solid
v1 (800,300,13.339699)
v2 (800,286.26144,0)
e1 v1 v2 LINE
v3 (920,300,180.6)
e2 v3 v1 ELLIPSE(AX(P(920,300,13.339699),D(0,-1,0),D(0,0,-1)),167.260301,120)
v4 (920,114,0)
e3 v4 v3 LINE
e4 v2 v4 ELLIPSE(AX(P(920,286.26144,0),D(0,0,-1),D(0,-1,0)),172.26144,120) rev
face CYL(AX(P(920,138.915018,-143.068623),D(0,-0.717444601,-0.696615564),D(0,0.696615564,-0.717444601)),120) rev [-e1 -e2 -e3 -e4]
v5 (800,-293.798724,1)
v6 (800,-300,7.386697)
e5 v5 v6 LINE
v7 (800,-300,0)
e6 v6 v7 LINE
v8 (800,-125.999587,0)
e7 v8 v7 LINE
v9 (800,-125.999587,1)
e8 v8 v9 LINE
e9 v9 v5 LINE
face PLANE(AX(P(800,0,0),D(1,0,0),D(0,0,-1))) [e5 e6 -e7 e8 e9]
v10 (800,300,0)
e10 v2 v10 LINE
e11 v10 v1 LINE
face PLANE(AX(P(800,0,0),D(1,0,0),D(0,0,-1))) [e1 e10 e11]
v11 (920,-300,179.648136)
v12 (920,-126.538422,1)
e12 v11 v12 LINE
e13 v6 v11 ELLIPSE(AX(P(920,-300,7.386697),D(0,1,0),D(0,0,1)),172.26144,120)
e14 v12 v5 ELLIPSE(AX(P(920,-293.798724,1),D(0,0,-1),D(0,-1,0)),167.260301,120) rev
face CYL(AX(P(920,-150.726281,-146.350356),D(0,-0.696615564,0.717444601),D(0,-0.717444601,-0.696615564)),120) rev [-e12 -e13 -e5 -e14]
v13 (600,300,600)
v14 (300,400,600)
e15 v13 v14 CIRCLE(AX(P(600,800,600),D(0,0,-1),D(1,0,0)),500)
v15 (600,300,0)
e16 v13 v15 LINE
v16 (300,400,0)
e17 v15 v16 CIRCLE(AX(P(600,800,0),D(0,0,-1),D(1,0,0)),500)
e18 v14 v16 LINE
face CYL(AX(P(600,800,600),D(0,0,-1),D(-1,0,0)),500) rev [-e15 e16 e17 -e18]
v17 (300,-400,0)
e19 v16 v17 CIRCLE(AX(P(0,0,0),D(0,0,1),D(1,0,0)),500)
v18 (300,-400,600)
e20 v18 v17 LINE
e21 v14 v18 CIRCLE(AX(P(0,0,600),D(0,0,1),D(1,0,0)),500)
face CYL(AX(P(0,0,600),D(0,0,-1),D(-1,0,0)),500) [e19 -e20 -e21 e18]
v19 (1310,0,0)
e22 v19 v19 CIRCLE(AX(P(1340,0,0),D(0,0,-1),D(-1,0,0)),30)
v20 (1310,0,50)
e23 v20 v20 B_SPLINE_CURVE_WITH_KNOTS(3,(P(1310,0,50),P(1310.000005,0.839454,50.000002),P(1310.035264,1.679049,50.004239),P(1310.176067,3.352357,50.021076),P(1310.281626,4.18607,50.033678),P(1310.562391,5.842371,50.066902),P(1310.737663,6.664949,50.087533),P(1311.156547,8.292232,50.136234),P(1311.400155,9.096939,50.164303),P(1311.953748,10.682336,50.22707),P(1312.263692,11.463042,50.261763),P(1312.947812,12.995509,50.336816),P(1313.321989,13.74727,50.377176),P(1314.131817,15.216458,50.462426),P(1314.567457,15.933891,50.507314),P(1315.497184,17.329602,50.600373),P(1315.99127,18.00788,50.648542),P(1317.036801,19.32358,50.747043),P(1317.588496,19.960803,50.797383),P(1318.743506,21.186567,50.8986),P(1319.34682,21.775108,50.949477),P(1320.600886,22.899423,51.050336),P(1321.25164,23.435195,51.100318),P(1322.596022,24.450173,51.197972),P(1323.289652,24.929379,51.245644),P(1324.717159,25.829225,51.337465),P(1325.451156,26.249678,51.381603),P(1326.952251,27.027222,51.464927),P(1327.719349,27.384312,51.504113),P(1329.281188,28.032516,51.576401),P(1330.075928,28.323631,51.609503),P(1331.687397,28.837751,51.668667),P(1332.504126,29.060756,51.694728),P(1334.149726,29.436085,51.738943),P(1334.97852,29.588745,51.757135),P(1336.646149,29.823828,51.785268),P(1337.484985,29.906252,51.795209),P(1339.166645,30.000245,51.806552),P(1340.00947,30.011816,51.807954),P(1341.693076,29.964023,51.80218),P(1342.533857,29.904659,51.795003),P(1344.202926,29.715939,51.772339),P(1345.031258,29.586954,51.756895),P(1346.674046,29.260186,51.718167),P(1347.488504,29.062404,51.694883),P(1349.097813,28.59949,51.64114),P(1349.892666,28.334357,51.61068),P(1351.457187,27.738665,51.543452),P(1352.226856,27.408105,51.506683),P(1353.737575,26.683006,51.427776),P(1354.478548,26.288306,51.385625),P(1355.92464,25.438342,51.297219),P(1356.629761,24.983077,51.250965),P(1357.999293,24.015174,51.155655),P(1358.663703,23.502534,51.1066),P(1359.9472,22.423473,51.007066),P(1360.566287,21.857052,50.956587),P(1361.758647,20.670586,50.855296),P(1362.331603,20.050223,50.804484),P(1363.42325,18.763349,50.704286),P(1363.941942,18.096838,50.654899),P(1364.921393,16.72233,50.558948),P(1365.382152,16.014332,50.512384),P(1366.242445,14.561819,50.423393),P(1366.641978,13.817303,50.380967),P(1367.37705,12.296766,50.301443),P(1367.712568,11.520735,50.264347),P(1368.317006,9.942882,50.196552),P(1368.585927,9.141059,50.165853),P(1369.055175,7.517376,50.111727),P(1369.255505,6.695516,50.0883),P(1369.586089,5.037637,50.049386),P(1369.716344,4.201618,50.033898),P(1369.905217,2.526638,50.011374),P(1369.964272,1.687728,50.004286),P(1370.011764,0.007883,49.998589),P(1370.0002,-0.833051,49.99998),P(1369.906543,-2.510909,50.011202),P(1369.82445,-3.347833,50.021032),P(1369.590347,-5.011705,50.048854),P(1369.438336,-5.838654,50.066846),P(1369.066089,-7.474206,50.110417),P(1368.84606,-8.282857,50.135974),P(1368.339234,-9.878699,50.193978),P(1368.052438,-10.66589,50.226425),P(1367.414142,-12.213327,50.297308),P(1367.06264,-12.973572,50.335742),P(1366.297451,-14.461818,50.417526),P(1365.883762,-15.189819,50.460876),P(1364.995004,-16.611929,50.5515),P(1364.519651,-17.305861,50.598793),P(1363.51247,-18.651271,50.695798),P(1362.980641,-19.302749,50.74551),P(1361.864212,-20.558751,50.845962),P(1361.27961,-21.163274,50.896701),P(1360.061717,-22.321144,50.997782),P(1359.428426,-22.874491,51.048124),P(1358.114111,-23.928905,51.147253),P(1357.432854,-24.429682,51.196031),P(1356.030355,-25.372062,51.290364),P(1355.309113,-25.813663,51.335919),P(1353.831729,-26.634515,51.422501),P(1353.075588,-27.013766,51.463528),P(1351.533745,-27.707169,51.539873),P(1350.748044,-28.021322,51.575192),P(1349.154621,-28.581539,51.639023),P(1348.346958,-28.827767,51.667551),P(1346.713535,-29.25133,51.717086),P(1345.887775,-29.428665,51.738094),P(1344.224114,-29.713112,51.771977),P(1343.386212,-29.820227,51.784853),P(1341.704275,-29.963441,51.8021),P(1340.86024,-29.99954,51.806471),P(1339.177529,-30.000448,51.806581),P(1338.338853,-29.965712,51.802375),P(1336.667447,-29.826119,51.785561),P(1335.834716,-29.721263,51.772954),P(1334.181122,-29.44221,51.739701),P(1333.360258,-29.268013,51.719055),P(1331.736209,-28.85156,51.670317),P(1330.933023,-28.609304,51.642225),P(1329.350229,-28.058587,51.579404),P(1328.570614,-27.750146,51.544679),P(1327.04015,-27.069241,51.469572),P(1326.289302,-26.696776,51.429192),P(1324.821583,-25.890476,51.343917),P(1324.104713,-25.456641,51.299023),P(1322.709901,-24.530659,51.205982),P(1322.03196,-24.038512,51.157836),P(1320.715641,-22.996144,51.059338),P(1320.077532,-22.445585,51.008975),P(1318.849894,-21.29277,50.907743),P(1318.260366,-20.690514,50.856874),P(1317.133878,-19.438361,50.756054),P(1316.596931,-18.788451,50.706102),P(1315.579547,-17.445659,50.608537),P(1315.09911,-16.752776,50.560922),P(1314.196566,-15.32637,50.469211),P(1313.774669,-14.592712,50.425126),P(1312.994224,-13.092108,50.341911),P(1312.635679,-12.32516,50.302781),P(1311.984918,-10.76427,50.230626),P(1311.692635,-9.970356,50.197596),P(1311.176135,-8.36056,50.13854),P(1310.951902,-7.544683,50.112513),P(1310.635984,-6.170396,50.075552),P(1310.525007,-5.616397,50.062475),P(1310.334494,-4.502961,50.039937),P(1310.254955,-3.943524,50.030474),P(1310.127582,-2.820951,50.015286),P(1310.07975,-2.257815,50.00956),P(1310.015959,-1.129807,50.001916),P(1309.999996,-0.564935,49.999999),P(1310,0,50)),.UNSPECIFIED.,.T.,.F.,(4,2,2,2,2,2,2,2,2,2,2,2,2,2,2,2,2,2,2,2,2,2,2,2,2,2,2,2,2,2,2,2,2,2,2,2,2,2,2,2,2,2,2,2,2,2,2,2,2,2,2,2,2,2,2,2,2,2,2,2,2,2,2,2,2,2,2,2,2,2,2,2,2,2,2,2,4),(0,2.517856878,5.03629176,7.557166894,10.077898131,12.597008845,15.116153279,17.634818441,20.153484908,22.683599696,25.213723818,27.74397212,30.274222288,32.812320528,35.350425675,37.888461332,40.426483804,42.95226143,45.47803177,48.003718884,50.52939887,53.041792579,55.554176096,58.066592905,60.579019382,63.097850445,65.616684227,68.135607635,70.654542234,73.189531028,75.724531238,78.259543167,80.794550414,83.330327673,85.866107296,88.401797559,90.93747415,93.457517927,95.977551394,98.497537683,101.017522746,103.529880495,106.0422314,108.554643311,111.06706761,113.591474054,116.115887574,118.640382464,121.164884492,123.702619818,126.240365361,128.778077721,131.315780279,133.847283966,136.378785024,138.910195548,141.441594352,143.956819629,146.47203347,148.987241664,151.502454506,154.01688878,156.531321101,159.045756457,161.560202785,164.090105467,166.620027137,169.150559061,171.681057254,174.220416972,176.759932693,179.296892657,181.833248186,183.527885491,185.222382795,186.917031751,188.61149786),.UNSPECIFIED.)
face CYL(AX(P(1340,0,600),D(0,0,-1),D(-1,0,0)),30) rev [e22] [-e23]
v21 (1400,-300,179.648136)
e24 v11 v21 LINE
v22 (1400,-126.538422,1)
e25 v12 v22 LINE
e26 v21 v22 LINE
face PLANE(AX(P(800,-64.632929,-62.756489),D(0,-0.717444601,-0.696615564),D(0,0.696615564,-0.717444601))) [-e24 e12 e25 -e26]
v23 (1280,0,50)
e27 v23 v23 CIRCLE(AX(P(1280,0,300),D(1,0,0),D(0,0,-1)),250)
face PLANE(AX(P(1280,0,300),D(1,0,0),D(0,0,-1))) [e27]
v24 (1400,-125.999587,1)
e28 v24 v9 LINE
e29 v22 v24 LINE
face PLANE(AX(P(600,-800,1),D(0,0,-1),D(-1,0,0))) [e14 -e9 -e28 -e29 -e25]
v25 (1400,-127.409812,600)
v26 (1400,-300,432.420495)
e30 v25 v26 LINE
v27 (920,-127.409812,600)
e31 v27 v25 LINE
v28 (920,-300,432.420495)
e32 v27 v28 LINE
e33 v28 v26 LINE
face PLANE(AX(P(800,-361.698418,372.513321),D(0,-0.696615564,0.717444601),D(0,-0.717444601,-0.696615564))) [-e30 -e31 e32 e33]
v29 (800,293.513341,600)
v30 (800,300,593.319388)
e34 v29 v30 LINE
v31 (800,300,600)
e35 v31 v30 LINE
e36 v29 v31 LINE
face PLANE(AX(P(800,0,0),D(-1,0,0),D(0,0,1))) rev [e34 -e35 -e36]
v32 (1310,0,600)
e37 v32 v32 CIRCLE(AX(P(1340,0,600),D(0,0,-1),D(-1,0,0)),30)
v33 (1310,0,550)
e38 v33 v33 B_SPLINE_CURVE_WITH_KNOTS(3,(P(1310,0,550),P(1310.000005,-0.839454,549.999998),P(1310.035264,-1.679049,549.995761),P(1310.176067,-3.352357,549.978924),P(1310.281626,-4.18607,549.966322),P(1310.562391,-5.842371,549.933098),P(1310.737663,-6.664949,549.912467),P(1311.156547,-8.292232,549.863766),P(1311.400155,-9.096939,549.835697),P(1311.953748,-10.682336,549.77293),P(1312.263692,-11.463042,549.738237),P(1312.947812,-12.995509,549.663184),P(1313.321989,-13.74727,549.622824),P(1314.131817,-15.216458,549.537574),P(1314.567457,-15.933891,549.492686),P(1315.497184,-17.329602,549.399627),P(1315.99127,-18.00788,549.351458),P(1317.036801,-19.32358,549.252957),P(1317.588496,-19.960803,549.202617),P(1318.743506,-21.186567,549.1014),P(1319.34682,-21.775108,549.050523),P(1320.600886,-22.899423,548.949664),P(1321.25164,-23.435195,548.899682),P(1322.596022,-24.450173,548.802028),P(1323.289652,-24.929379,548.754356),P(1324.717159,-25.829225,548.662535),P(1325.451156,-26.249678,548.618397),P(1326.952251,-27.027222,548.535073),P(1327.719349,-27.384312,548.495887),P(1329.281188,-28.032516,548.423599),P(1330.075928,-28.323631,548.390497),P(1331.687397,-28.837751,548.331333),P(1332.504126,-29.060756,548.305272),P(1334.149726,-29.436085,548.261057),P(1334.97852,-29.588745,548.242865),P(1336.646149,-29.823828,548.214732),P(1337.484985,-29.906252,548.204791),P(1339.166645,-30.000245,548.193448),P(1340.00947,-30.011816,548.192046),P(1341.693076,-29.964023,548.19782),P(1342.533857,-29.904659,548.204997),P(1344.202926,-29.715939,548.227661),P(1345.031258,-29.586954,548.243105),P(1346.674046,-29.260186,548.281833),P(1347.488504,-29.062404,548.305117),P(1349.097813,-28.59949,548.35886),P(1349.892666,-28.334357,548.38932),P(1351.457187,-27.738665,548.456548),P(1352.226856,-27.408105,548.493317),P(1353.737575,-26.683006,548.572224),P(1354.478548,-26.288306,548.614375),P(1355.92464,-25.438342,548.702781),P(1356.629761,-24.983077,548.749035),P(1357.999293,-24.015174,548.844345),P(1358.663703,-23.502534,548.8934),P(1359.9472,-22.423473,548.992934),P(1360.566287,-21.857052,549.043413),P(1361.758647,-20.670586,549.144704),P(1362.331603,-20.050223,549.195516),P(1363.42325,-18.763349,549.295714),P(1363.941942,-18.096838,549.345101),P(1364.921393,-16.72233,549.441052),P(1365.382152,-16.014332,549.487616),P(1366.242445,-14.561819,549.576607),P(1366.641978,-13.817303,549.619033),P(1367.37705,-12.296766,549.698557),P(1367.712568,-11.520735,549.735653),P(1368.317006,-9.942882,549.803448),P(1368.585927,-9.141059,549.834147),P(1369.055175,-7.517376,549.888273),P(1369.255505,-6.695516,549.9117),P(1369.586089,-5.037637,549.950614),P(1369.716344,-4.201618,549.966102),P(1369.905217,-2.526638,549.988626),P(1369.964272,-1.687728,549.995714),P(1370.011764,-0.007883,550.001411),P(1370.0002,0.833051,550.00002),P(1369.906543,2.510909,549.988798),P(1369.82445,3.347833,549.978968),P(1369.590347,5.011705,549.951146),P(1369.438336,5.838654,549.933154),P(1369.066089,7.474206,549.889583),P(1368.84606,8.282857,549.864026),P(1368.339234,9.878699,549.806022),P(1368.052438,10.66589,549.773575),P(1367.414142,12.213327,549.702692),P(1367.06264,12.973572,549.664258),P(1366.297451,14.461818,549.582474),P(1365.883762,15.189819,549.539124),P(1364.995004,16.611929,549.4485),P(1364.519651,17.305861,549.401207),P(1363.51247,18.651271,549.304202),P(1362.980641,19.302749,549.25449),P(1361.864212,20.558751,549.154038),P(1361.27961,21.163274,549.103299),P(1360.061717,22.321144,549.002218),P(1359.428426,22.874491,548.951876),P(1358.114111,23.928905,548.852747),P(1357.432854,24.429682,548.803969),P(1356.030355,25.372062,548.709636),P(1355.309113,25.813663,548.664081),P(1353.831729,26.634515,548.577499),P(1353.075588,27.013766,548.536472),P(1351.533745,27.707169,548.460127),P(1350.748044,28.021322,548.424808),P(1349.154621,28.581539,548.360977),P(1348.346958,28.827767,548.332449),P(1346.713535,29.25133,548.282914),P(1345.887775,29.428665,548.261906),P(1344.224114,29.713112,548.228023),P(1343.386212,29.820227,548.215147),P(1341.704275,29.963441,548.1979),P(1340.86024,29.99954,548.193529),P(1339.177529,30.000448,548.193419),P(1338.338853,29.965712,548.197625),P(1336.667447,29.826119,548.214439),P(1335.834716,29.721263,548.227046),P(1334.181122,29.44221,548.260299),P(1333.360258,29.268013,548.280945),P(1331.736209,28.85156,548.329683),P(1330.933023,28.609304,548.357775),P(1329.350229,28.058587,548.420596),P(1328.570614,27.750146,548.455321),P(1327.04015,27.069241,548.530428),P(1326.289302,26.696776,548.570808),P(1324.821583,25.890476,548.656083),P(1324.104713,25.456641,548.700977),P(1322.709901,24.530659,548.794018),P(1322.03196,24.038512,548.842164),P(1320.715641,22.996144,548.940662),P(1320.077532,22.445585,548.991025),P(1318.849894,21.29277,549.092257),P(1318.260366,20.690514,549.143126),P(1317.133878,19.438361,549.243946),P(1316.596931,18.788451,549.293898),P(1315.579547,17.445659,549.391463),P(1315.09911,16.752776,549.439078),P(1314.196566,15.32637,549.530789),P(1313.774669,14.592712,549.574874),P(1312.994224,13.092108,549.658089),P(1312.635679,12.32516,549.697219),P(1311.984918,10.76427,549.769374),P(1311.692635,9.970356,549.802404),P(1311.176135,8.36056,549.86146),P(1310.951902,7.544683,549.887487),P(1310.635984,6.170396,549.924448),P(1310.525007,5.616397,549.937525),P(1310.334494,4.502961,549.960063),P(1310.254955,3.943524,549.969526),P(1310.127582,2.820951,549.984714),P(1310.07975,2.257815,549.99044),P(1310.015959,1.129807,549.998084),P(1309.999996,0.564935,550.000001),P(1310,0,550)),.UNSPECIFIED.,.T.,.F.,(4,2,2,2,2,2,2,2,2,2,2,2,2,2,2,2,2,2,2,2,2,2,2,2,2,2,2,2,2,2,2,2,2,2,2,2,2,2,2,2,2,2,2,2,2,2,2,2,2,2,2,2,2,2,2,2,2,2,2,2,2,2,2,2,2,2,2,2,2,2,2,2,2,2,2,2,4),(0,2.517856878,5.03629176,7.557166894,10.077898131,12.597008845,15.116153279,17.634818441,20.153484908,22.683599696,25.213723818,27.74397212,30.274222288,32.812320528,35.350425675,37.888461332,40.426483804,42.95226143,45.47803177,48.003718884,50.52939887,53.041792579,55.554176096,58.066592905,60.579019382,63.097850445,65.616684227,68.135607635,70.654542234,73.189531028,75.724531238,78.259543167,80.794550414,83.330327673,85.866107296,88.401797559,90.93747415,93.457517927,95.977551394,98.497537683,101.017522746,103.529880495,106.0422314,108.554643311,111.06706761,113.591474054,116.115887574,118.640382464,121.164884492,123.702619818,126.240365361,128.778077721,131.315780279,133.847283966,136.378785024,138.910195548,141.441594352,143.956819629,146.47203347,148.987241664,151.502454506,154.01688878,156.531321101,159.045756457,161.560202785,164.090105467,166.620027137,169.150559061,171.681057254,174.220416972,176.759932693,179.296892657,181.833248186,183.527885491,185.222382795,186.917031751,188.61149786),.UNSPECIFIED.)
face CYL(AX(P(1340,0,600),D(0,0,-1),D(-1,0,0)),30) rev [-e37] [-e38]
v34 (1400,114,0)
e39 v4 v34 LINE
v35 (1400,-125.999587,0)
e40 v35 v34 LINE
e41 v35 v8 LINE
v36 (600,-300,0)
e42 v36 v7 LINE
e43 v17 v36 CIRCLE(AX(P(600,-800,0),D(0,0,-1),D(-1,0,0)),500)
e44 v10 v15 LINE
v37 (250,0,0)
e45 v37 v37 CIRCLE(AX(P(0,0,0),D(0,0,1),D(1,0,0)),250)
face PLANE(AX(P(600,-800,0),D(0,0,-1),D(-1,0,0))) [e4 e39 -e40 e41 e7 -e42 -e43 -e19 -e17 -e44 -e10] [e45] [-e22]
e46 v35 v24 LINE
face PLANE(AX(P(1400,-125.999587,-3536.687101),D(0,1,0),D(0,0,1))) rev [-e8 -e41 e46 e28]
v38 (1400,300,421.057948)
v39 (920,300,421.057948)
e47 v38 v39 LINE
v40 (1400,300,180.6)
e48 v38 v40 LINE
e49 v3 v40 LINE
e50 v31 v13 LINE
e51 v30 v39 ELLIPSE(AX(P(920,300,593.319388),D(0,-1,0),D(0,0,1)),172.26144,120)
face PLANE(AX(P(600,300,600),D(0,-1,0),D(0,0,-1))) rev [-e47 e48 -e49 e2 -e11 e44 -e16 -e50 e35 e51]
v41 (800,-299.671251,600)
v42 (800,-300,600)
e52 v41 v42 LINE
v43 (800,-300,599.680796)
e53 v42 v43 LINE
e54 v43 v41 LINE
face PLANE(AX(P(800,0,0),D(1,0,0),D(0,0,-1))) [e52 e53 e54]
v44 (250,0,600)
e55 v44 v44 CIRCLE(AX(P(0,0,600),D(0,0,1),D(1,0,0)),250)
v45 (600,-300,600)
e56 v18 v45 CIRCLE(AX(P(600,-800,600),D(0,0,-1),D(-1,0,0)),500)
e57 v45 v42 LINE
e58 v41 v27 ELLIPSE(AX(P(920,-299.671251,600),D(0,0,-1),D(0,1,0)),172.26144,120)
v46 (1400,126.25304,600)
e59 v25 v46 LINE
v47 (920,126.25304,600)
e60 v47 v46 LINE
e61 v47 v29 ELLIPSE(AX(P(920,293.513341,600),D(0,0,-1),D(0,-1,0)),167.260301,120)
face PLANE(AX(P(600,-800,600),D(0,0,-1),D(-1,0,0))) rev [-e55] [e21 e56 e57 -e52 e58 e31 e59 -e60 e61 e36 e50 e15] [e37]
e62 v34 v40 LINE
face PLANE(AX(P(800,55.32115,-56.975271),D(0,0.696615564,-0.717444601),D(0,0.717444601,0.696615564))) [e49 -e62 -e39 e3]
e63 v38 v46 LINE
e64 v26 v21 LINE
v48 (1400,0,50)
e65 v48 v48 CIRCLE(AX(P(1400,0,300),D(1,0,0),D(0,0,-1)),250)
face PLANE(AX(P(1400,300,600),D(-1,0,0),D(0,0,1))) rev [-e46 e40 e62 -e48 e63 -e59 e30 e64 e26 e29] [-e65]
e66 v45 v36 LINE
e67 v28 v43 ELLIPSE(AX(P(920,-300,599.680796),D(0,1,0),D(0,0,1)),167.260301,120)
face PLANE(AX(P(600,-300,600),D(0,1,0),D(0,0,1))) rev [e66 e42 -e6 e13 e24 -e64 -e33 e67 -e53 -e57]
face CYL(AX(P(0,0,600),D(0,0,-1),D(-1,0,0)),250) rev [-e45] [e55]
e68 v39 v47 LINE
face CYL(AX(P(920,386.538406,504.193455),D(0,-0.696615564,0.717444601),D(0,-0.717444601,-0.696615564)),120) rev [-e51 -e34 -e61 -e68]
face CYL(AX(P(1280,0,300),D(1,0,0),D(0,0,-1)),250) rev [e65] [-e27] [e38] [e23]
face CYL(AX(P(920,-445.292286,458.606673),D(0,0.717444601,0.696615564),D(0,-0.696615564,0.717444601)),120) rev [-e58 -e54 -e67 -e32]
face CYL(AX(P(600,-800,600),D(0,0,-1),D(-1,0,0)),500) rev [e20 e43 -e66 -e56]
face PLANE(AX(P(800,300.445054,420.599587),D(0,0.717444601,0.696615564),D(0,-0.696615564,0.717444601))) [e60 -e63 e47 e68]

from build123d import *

# Parameters (mm, degrees)
SKETCH1_R              = 250
BOSS_EXTRUDE1_DEPTH    = 600
CUT_EXTRUDE6_DEPTH     = 600
CUT_EXTRUDE8_START     = -1
CUT_EXTRUDE8_OUTLINE_W = 600
CUT_EXTRUDE8_OUTLINE_H = 174.000412652
CUT_EXTRUDE8_DEPTH     = 1
FILLET2_R              = 120
SKETCH8_R              = 250
CUT_EXTRUDE10_DEPTH    = 120
SKETCH9_R              = 30
CUT_EXTRUDE11_DEPTH    = 1604.121954188


# Read off the part's stored shape, not the designer's step: Cut-Extrude8
with BuildPart() as part:
    # Sketch1 → Boss-Extrude1 (new body)
    with BuildSketch(Plane.XY):
        with BuildLine():
            Line((600, 300), (1400, 300))
            Line((1400, 300), (1400, -300))
            Line((1400, -300), (600, -300))
            ThreePointArc((600, -300), (441.886116992, -325.658350975), (300, -400))
            ThreePointArc((300, -400), (-500, 0), (300, 400))
            ThreePointArc((300, 400), (441.886116992, 325.658350975), (600, 300))
        make_face()
        Circle(SKETCH1_R, mode=Mode.SUBTRACT)
    extrude(amount=BOSS_EXTRUDE1_DEPTH)

    # Sketch2 → Cut-Extrude6 (cut)
    with BuildSketch(Plane(origin=(1400, 0, 0), x_dir=(0, 0, -1), z_dir=(1, 0, 0))):
        Polygon((-180.6, 300), (0, 114), (0, 300), align=None)
        Polygon((-600, -300), (-432.420494682, -300), (-600, -127.409811799), align=None)
        Polygon((-0.445053521, -300), (-0.445053521, -125.999587348), (-179.648136318, -300), align=None)
        Polygon((-606.599587348, 119.845053521), (-606.599587348, 300.445053521), (-420.599587348, 300.445053521), align=None)
    extrude(amount=-CUT_EXTRUDE6_DEPTH, mode=Mode.SUBTRACT)

    # Cut-Extrude8 outline → Cut-Extrude8 (cut)
    with BuildSketch(Plane(origin=(0, 0, 0), x_dir=(-1, 0, 0), z_dir=(0, 0, -1)).offset(CUT_EXTRUDE8_START)):
        with Locations((-1100, -212.999793674)):
            Rectangle(CUT_EXTRUDE8_OUTLINE_W, CUT_EXTRUDE8_OUTLINE_H)
    extrude(amount=CUT_EXTRUDE8_DEPTH, mode=Mode.SUBTRACT)

    # Fillet2
    fillet2_edges = [part.edges().sort_by_distance(p)[0] for p in [
        (800, 213.126519973, 510.528974059),
        (800, -213.269211239, 90.324068159),
        (800, -213.7049059, 516.210247341),
        (800, 207, 90.3),
    ]]
    fillet(fillet2_edges, radius=FILLET2_R)

    # Sketch8 → Cut-Extrude10 (cut)
    with BuildSketch(Plane(origin=(1400, 0, 0), x_dir=(0, 0, -1), z_dir=(1, 0, 0))):
        with Locations((-300, 0)):
            Circle(SKETCH8_R)
    extrude(amount=-CUT_EXTRUDE10_DEPTH, mode=Mode.SUBTRACT)

    # Sketch9 → Cut-Extrude11 (cut, through all)
    with BuildSketch(Plane(origin=(0, 0, 0), x_dir=(-1, 0, 0), z_dir=(0, 0, -1))):
        with Locations((-1340, 0)):
            Circle(SKETCH9_R)
    extrude(amount=-CUT_EXTRUDE11_DEPTH, mode=Mode.SUBTRACT)


solid = part.part
